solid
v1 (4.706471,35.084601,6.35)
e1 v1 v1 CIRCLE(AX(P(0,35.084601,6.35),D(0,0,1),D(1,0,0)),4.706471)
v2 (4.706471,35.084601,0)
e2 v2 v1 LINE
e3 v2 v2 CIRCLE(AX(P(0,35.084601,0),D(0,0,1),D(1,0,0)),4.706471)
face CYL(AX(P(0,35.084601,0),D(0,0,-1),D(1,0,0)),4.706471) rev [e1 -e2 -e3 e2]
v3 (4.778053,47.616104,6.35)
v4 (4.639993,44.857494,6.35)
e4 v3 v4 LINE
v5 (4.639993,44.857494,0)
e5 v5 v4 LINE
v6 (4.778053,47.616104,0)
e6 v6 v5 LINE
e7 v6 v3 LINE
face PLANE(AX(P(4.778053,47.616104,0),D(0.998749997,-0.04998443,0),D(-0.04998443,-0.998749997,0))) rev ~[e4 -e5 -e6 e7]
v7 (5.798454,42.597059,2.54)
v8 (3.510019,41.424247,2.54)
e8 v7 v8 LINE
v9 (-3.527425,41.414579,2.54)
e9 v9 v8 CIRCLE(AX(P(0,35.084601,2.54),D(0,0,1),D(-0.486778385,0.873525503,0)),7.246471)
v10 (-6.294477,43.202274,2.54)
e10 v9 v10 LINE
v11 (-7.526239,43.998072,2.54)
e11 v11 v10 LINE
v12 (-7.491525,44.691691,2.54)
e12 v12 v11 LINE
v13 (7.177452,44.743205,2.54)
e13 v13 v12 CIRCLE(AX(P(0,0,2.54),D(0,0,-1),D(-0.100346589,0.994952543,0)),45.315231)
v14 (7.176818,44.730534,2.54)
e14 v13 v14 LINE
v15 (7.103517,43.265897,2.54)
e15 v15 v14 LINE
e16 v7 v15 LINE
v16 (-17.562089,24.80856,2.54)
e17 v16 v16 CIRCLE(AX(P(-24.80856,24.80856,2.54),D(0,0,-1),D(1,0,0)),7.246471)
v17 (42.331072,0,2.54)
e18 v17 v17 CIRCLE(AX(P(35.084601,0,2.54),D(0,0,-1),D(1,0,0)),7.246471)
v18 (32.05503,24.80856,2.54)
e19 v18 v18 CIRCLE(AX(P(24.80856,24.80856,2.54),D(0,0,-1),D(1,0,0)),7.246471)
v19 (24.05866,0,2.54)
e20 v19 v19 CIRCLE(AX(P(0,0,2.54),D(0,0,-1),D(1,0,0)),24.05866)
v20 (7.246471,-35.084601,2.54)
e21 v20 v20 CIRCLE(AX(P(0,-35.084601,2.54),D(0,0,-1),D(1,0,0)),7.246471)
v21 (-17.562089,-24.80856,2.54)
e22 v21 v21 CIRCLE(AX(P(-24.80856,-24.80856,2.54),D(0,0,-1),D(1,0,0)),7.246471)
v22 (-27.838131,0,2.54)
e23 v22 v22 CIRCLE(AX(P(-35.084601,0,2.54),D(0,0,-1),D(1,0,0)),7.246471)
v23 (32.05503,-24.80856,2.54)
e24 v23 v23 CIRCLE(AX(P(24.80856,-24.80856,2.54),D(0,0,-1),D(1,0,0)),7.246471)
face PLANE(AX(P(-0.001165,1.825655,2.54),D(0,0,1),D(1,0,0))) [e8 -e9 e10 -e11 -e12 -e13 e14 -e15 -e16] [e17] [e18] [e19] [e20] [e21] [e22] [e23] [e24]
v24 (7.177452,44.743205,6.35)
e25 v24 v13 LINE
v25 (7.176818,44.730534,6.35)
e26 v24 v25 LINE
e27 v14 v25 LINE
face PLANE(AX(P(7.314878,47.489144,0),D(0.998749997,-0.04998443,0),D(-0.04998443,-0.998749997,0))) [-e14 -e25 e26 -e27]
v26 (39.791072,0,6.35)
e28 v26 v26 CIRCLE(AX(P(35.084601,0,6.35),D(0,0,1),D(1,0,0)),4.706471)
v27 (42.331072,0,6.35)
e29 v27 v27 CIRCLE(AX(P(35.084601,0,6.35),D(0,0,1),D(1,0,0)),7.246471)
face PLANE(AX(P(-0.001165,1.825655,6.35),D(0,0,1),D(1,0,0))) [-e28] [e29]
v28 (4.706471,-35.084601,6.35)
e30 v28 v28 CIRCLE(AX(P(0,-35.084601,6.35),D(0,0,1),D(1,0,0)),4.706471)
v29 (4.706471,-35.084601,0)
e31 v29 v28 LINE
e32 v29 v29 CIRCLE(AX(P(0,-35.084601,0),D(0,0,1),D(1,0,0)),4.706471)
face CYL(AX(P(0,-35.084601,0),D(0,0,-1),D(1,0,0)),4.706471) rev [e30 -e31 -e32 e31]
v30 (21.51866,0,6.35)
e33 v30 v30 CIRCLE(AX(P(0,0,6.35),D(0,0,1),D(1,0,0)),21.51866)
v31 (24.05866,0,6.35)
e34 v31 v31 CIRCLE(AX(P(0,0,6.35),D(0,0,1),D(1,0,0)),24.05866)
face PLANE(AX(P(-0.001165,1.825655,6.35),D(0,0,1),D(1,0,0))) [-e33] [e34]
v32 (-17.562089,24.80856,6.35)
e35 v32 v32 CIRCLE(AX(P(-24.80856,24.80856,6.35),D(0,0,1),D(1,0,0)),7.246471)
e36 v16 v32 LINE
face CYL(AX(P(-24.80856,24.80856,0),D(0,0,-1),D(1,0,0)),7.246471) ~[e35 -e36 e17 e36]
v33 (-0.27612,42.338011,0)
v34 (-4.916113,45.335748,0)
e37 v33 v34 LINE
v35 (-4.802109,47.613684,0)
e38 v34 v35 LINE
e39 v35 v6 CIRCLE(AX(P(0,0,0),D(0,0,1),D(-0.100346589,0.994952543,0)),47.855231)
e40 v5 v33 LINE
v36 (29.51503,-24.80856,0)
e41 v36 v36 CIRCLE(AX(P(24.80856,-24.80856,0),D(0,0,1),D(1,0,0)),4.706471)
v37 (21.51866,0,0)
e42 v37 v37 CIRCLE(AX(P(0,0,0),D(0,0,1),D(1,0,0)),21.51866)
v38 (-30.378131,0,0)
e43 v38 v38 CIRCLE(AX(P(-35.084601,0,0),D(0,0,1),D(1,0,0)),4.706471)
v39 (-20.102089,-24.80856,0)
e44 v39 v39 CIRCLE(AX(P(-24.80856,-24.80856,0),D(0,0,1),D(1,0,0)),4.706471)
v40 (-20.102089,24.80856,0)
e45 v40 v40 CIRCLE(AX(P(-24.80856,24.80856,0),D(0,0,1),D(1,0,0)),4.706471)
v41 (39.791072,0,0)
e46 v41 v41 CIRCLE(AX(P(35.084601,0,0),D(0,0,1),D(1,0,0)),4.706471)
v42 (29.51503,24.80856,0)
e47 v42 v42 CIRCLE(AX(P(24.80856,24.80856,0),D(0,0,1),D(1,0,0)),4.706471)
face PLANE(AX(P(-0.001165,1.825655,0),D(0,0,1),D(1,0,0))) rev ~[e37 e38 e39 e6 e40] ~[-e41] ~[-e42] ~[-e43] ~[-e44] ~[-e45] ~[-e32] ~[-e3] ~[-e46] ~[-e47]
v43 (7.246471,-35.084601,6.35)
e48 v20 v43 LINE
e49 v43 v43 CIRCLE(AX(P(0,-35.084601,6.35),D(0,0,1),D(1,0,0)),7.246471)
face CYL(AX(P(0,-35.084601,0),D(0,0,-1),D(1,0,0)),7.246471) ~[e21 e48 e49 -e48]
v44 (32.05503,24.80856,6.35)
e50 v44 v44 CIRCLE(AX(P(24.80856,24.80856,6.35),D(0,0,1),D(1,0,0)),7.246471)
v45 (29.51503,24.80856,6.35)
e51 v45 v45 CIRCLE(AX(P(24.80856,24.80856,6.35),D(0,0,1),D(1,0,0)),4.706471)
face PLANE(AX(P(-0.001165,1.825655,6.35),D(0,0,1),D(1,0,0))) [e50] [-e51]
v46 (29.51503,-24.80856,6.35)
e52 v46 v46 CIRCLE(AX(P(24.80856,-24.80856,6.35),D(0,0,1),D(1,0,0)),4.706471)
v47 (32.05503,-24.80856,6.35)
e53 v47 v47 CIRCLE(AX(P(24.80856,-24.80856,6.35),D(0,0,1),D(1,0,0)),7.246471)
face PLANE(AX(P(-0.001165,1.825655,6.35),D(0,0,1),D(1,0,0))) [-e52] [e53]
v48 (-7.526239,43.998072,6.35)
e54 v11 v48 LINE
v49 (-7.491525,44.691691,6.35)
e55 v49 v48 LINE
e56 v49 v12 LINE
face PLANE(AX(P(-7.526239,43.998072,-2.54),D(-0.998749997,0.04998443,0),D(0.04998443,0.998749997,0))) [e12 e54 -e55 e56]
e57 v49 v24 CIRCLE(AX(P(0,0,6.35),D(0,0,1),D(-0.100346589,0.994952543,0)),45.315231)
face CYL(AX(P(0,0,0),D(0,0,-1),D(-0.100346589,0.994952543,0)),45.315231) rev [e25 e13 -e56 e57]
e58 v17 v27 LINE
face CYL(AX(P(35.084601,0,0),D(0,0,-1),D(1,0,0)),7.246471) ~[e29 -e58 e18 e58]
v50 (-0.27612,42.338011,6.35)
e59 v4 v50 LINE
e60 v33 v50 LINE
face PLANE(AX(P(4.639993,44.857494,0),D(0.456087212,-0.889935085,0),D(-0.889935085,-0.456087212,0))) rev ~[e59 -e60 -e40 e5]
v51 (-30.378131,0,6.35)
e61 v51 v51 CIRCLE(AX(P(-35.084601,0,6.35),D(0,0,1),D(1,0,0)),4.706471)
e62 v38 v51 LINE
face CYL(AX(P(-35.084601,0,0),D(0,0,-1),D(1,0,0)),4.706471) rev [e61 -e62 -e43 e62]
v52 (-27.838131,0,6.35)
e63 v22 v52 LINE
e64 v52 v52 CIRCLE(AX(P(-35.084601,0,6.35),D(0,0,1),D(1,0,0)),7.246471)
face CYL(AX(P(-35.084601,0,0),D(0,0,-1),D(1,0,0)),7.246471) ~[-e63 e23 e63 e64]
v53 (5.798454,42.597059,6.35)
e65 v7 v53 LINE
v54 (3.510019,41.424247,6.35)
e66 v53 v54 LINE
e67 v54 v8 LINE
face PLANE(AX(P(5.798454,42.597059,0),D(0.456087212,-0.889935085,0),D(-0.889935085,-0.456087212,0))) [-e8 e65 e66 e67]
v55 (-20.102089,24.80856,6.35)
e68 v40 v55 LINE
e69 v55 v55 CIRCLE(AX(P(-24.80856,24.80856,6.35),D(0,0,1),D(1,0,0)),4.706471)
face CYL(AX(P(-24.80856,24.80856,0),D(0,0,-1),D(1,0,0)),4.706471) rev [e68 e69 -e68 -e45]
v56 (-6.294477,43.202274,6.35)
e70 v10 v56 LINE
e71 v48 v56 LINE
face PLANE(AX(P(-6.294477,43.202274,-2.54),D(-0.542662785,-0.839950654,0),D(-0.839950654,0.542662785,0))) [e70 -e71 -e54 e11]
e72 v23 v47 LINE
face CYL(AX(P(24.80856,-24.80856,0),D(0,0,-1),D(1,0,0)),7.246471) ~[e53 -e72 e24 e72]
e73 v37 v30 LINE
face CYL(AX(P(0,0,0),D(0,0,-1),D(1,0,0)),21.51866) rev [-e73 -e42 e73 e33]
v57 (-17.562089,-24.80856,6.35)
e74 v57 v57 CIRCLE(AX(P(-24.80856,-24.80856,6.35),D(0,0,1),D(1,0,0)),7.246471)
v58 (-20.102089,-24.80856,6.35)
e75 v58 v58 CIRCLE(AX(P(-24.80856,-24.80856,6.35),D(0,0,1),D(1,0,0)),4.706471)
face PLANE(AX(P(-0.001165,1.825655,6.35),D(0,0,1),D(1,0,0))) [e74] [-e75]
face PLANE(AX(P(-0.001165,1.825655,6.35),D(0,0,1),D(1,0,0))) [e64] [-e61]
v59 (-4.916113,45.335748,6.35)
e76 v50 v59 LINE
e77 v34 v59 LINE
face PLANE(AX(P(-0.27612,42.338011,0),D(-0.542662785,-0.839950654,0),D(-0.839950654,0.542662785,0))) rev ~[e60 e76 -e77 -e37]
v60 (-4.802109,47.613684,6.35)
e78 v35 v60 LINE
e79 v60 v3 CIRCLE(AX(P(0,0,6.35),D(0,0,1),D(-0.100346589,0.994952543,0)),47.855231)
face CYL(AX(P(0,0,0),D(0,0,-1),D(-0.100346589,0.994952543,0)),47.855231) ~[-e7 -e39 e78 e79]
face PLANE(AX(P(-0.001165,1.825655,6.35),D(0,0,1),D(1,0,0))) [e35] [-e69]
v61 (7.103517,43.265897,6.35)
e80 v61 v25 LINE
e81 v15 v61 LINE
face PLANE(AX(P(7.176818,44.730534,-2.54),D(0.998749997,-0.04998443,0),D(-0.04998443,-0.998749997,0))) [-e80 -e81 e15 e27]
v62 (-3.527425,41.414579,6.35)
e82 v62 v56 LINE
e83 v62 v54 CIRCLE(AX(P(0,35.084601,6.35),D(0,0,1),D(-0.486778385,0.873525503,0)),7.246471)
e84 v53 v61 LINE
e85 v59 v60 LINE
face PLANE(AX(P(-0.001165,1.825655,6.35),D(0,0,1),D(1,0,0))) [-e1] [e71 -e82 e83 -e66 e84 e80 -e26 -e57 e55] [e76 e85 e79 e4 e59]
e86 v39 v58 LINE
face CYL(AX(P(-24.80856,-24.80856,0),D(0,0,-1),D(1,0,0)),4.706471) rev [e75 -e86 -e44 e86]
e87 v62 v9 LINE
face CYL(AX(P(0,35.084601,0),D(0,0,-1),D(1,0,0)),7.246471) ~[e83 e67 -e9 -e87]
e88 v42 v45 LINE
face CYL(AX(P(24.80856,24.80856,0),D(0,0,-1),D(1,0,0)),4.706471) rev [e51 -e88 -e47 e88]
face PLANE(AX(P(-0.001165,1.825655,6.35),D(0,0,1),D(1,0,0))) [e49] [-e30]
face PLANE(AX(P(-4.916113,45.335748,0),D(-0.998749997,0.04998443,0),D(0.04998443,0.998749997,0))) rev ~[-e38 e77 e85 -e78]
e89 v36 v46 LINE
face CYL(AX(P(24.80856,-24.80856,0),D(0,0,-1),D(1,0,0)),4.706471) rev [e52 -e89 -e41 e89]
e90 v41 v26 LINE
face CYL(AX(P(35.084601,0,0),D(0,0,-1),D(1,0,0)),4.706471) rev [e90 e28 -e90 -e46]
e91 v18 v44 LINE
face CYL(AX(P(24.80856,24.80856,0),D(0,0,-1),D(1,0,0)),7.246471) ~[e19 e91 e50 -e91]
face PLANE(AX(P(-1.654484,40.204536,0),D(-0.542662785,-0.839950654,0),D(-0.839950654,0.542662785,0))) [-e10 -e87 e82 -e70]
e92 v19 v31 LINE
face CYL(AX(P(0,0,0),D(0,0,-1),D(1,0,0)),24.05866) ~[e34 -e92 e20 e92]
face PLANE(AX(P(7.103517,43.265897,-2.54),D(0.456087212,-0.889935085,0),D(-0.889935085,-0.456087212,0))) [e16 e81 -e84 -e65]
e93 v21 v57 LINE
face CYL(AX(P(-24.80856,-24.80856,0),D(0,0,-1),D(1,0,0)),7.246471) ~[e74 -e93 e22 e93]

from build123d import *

# Parameters (mm, degrees)
F0_R        = 4.7064707614
F0_R_2      = 21.5186597363
F1_DEPTH    = 6.35
F2_T        = 2.54
F2_T3_DEPTH = 11.43


# Not quite as in the source:
# - a shell that OpenCascade refuses in one call is made with other operations: the cavity is built on its own and cut out


with BuildPart() as f1:
    # F0 (on Top) → F1 (new body)
    with BuildSketch(Plane.XY):
        with BuildLine():
            Line((-4.9161130278, 45.3357483006), (-4.8021092029, 47.6136840266))
            ThreePointArc((-4.8021092029, 47.6136840266), (0.0120888652, -47.8552297376), (4.7780528964, 47.6161041025))
            Line((4.7780528964, 47.6161041025), (4.639992765, 44.8574939765))
            Line((4.639992765, 44.8574939765), (-0.2761202627, 42.3380110126))
            Line((-0.2761202627, 42.3380110126), (-4.9161130278, 45.3357483006))
        make_face()
        with Locations((-24.80855963, -24.80855963)):
            Circle(F0_R, mode=Mode.SUBTRACT)
        with Locations((0, -35.0846014917)):
            Circle(F0_R, mode=Mode.SUBTRACT)
        with Locations((24.80855963, -24.80855963)):
            Circle(F0_R, mode=Mode.SUBTRACT)
        with Locations((-35.0846014917, 0)):
            Circle(F0_R, mode=Mode.SUBTRACT)
        with Locations((-24.80855963, 24.80855963)):
            Circle(F0_R, mode=Mode.SUBTRACT)
        Circle(F0_R_2, mode=Mode.SUBTRACT)
        with Locations((35.0846014917, 0)):
            Circle(F0_R, mode=Mode.SUBTRACT)
        with Locations((0, 35.0846014917)):
            Circle(F0_R, mode=Mode.SUBTRACT)
        with Locations((24.80855963, 24.80855963)):
            Circle(F0_R, mode=Mode.SUBTRACT)
    extrude(amount=F1_DEPTH)

    # F2: shell of thickness 2.54, made by hand


with BuildPart() as f2_core1:
    # F2_t2: copy of F1
    add(f1.part)

    # the walls: a layer under each face that stays
    f2_faces = [f2_core1.faces().sort_by_distance(p)[0] for p in [
        (-2.5961166453, 43.8368796566, 3.175),
        (-4.8591111154, 46.4747161636, 3.175),
        (0.0120888652, -47.8552297376, 3.175),
        (4.7090228307, 46.2367990395, 3.175),
        (2.1819362512, 43.5977524946, 3.175),
        (-29.5150303914, -24.80855963, 3.175),
        (-4.7064707614, -35.0846014917, 3.175),
        (20.1020888686, -24.80855963, 3.175),
        (-39.7910722531, 0, 3.175),
        (-29.5150303914, 24.80855963, 3.175),
        (-21.5186597363, 0, 3.175),
        (30.3781307302, 0, 3.175),
        (-4.7064707614, 35.0846014917, 3.175),
        (20.1020888686, 24.80855963, 3.175),
        (-31.9034875097, -31.9433420367, 0),
    ]]
    thicken(f2_faces, amount=-F2_T, mode=Mode.SUBTRACT)

    # F2_s4 → F2_t3 (cut)
    with BuildSketch(Plane.XY.offset(-2.54)):
        Polygon((-0.2739212432, 42.3819501104), (-1.6544837368, 40.2045363506), (-0.4227215664, 39.4087378278), (0.8823412559, 40.0775758974), align=None)
        Polygon((-4.8769611431, 45.3558134427), (-6.2944765018, 43.2022736386), (-7.5262386722, 43.9980721614), (-7.4529380204, 45.4627087538), align=None)
        Polygon((4.6030398999, 44.8813679322), (7.1768177577, 44.7305335234), (7.1035171059, 43.265896931), (5.7984542836, 42.5970588614), align=None)
    extrude(amount=F2_T3_DEPTH, mode=Mode.SUBTRACT)


with BuildPart() as f1_1:
    add(f1.part)

    # what is left inside the walls is the cavity
    f2_cavity = [f2_core1.part.solids().sort_by_distance(p)[0] for p in [
        (-22.657616, 14.723726, 2.5654),
    ]]
    add(f2_cavity, mode=Mode.SUBTRACT)


solid = f1_1.part
